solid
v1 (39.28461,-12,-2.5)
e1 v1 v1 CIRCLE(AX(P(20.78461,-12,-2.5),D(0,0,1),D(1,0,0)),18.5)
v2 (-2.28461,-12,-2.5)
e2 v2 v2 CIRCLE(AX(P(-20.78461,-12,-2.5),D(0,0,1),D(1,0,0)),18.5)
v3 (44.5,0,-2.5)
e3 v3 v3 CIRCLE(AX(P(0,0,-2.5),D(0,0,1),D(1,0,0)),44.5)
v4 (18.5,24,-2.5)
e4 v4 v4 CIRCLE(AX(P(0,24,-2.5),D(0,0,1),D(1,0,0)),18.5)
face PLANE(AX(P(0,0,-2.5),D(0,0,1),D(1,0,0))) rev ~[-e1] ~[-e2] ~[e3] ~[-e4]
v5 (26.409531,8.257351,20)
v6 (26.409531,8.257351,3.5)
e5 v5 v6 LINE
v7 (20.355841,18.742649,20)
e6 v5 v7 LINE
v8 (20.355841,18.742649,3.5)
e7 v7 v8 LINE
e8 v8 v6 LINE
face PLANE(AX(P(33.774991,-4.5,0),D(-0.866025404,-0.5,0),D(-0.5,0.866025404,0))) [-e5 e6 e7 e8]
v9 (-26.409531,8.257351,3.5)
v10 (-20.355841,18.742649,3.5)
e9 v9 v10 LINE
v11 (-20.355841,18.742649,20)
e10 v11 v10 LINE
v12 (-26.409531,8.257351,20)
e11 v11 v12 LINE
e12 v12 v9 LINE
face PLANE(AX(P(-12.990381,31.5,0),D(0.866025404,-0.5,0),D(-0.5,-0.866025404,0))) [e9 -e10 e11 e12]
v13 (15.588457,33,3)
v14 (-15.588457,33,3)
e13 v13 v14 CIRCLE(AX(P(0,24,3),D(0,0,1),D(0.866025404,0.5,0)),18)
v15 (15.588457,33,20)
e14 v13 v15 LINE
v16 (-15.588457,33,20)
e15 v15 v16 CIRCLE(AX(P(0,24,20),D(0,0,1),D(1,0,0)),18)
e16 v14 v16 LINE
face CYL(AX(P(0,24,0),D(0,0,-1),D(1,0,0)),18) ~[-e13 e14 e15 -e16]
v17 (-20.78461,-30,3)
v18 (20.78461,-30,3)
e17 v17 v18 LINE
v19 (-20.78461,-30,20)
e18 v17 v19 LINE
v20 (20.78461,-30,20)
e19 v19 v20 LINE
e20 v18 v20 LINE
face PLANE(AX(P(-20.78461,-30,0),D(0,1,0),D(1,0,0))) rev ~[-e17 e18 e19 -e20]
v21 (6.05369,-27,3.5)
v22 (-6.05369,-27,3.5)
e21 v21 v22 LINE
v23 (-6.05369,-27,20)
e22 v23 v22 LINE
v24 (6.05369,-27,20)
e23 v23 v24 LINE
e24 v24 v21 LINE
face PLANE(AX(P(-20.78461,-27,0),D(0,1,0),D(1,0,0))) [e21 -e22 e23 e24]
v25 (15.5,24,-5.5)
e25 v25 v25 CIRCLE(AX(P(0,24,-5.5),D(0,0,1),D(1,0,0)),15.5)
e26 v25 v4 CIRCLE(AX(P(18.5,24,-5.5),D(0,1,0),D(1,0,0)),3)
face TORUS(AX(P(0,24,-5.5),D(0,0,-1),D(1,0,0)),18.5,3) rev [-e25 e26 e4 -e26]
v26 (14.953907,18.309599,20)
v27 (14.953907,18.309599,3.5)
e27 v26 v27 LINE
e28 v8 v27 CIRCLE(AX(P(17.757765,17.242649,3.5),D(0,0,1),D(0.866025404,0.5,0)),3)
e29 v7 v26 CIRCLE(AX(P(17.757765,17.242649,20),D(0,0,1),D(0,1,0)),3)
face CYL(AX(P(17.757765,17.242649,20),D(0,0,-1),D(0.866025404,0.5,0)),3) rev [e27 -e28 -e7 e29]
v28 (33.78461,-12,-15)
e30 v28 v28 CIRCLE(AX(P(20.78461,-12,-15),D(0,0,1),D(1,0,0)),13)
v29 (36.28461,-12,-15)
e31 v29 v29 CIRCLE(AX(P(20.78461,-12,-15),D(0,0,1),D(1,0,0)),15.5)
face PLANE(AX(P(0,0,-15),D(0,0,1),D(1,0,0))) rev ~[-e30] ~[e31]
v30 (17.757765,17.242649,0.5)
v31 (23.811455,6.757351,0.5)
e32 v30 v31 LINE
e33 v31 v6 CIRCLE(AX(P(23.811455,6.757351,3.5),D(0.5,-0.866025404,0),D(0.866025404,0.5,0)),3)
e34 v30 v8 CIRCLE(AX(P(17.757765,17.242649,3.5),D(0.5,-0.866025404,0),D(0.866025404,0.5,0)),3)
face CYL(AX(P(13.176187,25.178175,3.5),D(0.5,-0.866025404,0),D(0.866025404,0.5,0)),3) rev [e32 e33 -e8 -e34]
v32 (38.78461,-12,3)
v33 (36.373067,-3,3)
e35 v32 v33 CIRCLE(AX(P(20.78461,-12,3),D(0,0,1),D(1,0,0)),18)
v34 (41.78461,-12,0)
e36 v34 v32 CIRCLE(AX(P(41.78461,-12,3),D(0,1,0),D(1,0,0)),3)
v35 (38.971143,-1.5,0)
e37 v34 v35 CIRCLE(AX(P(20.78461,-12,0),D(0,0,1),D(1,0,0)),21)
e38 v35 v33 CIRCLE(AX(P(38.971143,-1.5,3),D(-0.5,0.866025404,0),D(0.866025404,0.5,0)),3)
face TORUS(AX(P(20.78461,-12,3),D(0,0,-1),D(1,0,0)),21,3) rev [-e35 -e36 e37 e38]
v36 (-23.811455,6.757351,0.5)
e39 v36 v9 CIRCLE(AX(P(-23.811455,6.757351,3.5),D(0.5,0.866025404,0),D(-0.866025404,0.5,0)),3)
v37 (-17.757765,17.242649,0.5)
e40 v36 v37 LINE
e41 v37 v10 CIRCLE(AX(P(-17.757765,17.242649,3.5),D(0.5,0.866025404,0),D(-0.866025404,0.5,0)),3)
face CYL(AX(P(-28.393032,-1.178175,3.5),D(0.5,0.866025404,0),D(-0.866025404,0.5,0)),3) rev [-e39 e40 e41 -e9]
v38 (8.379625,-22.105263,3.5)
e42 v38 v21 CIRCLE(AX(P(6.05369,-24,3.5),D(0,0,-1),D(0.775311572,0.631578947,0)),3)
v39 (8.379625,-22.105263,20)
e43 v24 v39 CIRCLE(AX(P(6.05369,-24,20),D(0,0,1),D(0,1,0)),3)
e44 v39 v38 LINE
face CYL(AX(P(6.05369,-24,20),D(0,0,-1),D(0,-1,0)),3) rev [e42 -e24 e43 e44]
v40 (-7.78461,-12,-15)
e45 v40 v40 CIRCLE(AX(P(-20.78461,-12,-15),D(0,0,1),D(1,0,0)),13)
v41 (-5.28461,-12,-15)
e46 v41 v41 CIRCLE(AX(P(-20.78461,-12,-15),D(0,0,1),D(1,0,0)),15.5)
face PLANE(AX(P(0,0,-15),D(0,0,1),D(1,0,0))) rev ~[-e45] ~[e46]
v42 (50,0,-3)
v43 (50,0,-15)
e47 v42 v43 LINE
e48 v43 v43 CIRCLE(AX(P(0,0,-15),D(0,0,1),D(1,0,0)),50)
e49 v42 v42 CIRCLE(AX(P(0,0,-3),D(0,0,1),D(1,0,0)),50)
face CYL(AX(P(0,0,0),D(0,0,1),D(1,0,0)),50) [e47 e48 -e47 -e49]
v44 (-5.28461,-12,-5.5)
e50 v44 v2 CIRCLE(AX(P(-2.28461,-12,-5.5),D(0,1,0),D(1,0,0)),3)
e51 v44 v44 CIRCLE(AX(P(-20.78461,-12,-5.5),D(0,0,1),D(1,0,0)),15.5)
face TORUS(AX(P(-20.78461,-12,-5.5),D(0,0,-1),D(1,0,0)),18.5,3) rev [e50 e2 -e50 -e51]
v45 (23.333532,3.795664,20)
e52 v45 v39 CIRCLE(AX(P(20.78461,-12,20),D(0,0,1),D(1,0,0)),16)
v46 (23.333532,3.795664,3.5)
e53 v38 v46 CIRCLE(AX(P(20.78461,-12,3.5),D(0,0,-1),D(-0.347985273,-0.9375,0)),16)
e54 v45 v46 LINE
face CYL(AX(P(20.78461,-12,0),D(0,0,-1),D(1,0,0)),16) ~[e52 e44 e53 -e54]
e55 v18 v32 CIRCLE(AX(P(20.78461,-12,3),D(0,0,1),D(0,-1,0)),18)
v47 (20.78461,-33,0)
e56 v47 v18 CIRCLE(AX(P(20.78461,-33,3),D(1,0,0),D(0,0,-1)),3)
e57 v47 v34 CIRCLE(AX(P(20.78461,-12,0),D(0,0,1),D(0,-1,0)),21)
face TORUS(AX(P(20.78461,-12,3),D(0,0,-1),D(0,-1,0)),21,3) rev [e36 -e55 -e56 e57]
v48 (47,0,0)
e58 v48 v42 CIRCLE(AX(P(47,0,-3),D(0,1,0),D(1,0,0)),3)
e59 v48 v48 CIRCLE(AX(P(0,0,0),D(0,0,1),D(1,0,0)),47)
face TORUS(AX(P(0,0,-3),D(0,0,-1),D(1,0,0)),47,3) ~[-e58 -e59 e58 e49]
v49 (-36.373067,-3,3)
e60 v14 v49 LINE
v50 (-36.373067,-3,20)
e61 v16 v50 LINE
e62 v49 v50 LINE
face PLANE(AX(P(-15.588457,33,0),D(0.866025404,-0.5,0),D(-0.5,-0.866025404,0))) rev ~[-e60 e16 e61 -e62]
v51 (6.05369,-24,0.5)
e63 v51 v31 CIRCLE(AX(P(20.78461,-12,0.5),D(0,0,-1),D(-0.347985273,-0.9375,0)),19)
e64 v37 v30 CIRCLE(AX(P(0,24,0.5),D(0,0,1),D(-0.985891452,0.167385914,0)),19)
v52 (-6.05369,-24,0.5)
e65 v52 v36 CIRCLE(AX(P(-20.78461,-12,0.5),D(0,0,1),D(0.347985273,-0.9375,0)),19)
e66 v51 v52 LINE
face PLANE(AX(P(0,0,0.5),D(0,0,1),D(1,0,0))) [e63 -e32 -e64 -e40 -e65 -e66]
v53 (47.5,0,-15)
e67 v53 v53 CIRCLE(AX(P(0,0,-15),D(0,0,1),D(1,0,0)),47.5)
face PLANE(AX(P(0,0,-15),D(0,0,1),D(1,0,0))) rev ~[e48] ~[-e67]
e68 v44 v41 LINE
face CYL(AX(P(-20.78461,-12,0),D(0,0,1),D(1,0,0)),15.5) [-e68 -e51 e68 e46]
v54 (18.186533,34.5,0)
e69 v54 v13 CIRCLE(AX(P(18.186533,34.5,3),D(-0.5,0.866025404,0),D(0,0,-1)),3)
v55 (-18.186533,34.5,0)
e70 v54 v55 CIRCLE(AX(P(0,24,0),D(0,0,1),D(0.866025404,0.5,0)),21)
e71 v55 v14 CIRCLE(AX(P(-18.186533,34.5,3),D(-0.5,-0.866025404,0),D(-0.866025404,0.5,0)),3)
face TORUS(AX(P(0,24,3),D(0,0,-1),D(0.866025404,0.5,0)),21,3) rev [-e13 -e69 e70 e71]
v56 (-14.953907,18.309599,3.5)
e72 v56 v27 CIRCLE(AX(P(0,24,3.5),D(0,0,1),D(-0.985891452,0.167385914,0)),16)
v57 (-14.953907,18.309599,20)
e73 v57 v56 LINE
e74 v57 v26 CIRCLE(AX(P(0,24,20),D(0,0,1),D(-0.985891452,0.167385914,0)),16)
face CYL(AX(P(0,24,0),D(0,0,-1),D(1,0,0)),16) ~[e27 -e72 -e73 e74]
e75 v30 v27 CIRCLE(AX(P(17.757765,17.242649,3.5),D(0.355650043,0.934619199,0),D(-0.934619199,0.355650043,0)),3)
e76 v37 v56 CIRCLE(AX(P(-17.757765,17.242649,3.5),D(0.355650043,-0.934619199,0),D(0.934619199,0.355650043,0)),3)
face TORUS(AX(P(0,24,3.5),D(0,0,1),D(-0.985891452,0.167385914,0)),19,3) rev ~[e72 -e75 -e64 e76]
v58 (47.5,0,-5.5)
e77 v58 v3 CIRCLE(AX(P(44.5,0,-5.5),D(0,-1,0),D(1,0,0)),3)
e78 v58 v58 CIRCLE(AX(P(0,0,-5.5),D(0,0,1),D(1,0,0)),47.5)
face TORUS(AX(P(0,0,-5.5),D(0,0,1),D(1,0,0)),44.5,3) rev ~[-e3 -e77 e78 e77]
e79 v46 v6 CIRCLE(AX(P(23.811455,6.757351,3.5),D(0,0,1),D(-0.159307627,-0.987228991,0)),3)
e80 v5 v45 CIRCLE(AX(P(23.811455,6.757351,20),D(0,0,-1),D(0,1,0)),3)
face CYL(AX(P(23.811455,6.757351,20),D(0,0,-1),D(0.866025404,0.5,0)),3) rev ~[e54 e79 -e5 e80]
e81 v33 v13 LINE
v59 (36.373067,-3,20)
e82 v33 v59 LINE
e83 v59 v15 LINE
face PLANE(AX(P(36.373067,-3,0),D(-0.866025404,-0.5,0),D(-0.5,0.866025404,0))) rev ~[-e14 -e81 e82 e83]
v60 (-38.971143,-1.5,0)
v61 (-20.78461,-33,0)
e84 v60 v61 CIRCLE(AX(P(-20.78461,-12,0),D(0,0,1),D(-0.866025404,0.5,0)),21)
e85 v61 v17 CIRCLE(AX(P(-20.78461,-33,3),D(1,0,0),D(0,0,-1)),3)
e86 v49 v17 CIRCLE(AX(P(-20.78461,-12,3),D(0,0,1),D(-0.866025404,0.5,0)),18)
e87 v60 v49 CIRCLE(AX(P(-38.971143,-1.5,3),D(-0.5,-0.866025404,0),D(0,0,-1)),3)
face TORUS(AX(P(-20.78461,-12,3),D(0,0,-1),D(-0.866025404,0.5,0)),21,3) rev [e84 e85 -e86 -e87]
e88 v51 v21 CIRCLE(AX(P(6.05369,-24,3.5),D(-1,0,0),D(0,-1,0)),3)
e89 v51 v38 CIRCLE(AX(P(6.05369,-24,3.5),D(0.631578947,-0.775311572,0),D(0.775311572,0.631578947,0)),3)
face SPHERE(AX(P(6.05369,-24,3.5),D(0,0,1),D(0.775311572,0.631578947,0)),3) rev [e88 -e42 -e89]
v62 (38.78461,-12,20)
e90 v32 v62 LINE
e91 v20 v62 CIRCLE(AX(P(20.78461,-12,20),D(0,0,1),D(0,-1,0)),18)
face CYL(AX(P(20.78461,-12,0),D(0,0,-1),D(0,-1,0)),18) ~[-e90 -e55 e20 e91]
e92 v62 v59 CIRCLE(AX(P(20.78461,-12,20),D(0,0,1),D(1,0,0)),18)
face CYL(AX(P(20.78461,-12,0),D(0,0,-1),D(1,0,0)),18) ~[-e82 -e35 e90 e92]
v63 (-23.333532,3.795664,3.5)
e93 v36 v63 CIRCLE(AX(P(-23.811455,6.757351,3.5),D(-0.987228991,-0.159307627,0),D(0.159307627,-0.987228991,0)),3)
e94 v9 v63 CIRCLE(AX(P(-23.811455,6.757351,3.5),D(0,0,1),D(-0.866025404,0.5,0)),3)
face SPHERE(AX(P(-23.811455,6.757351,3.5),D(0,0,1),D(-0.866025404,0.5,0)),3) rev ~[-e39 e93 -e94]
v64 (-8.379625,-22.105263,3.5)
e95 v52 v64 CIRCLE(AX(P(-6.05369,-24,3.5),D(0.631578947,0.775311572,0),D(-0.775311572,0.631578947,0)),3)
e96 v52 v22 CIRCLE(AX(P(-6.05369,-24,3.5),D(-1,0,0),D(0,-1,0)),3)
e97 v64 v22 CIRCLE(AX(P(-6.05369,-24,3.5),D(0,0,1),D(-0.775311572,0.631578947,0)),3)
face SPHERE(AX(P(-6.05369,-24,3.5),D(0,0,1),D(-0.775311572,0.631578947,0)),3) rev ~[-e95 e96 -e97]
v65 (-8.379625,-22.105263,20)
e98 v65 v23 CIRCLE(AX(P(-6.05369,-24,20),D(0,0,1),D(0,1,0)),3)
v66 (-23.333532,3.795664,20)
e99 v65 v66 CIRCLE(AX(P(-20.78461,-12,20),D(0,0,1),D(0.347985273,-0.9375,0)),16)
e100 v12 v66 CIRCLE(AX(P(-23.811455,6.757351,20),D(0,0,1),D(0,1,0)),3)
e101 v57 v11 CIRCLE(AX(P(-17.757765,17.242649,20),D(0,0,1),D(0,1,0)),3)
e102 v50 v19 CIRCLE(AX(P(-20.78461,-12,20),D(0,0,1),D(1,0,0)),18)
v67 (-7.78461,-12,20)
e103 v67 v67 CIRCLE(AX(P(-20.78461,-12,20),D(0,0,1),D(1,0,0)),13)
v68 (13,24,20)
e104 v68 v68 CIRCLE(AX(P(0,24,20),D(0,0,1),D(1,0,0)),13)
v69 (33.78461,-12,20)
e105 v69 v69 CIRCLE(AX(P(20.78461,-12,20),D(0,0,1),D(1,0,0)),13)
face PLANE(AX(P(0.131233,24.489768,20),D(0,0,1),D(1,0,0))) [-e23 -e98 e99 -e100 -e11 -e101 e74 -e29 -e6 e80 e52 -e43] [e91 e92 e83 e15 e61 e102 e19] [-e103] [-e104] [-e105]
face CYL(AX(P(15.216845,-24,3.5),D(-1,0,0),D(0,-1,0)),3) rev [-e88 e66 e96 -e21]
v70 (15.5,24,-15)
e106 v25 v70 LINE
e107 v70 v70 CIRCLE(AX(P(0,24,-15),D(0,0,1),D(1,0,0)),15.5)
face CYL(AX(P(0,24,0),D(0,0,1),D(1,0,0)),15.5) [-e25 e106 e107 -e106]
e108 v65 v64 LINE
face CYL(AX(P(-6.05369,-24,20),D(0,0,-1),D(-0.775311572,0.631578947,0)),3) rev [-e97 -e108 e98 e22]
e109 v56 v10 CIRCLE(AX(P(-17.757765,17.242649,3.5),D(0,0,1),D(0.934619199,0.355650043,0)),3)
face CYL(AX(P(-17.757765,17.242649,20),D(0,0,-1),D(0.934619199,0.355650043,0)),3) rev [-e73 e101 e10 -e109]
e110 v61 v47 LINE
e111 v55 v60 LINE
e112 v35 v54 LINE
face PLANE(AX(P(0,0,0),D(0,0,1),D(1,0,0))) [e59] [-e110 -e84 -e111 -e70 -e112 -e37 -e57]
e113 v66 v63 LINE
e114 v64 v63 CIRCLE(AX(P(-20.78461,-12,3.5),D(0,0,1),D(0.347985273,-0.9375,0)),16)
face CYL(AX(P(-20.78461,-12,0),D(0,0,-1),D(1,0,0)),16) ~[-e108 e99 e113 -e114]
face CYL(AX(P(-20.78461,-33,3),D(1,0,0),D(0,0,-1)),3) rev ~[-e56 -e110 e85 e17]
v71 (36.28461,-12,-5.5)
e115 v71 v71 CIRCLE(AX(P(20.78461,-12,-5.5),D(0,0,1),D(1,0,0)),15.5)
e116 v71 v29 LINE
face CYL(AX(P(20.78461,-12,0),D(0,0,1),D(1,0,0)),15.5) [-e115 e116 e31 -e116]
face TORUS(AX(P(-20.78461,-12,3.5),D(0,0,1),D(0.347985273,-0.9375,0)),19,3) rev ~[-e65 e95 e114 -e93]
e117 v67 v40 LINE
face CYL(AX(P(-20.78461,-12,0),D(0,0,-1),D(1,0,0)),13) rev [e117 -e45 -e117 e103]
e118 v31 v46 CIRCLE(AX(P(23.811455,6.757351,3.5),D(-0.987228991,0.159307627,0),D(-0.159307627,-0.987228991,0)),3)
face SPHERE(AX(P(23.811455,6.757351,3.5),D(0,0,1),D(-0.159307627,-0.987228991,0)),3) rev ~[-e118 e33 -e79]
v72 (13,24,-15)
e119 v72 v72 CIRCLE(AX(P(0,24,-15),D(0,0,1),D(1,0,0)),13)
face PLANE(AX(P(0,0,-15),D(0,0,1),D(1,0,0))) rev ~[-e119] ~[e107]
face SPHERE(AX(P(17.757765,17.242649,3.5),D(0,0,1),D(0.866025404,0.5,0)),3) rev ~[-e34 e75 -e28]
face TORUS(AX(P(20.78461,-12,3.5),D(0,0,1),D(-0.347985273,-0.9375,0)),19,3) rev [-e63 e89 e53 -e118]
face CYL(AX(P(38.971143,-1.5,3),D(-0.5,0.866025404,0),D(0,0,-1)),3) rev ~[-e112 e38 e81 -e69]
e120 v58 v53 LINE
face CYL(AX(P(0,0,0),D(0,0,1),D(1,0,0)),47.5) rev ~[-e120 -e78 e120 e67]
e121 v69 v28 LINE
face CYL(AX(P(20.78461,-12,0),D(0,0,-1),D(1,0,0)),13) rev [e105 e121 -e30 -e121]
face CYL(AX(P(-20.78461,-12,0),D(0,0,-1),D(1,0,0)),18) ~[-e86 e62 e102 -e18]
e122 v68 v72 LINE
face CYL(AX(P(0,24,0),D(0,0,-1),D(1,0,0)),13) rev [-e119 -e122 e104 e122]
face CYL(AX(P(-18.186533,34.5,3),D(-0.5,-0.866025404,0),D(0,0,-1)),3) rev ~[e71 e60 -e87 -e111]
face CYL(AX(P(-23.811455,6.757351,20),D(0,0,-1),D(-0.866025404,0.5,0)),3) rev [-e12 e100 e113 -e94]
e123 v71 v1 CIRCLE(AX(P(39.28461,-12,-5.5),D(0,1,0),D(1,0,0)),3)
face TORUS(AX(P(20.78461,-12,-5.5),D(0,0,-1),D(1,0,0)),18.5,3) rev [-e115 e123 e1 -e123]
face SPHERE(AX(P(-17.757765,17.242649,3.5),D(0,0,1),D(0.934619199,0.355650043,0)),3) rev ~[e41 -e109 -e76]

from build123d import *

# Parameters (mm, degrees)
F0_R         = 50
F0_R_2       = 13
F1_DEPTH     = 15
F2_T         = -2.5
F3_DEPTH     = 20
F4_T         = 3
F4_T3_DEPTH  = 47.5692193817
F4_T5_DEPTH  = 47.5692193817
F4_T7_DEPTH  = 47.5692193817
F4_T18_ANGLE = 120.000000001
F4_T20_ANGLE = 120.000000001
F4_T22_ANGLE = 120.000000001
F5_R         = 3


# Not quite as in the source:
# - two fillets or chamfers of one size are made in one step
# - a shell that OpenCascade refuses in one call is made with other operations: the cavity is built on its own and cut out


with BuildPart() as f1:
    # F0 (on Top) → F1 (new body)
    with BuildSketch(Plane.XY):
        Circle(F0_R)
        with BuildLine():
            ThreePointArc((-20.7846096908, -30), (-36.3730669589, -21), (-36.3730669589, -3))
            Line((-36.3730669589, -3), (-15.5884572681, 33))
            ThreePointArc((-15.5884572681, 33), (0, 42), (15.5884572681, 33))
            Line((15.5884572681, 33), (36.3730669589, -3))
            ThreePointArc((36.3730669589, -3), (38.171274564, -7.3412571882), (38.7846096908, -12))
            ThreePointArc((38.7846096908, -12), (33.5125317522, -24.7279220614), (20.7846096908, -30))
            Line((20.7846096908, -30), (-20.7846096908, -30))
        make_face(mode=Mode.SUBTRACT)
        with BuildLine():
            ThreePointArc((-20.7846096908, -30), (-8.0566876295, -24.7279220614), (-2.7846096908, -12))
            ThreePointArc((-2.7846096908, -12), (-16.125866879, 5.3866648732), (-36.3730669589, -3))
            ThreePointArc((-36.3730669589, -3), (-36.3730669589, -21), (-20.7846096908, -30))
        make_face()
        with Locations((-20.7846096908, -12)):
            Circle(F0_R_2, mode=Mode.SUBTRACT)
        with BuildLine():
            ThreePointArc((15.5884572681, 33), (0, 42), (-15.5884572681, 33))
            ThreePointArc((-15.5884572681, 33), (-4.6587428118, 6.6133351268), (18, 24))
            ThreePointArc((18, 24), (17.3866648732, 28.6587428118), (15.5884572681, 33))
        make_face()
        with Locations((0, 24)):
            Circle(F0_R_2, mode=Mode.SUBTRACT)
        with BuildLine():
            ThreePointArc((36.3730669589, -3), (5.1961524227, -3), (20.7846096908, -30))
            ThreePointArc((20.7846096908, -30), (33.5125317522, -24.7279220614), (38.7846096908, -12))
            ThreePointArc((38.7846096908, -12), (38.171274564, -7.3412571882), (36.3730669589, -3))
        make_face()
        with Locations((20.7846096908, -12)):
            Circle(F0_R_2, mode=Mode.SUBTRACT)
        with BuildLine():
            ThreePointArc((-36.3730669589, -3), (-16.125866879, 5.3866648732), (-2.7846096908, -12))
            ThreePointArc((-2.7846096908, -12), (-8.0566876295, -24.7279220614), (-20.7846096908, -30))
            Line((-20.7846096908, -30), (20.7846096908, -30))
            ThreePointArc((20.7846096908, -30), (5.1961524227, -3), (36.3730669589, -3))
            Line((36.3730669589, -3), (15.5884572681, 33))
            ThreePointArc((15.5884572681, 33), (17.3866648732, 28.6587428118), (18, 24))
            ThreePointArc((18, 24), (-4.6587428118, 6.6133351268), (-15.5884572681, 33))
            Line((-15.5884572681, 33), (-36.3730669589, -3))
        make_face()
    extrude(amount=-F1_DEPTH)

    # F2
    f2_openings = [f1.faces().sort_by_distance(p)[0] for p in [
        (0, 0, -15),
    ]]
    offset(amount=F2_T, openings=f2_openings)

    # F0 (on Top) → F3 (join)
    with BuildSketch(Plane.XY):
        with BuildLine():
            ThreePointArc((15.5884572681, 33), (0, 42), (-15.5884572681, 33))
            ThreePointArc((-15.5884572681, 33), (-4.6587428118, 6.6133351268), (18, 24))
            ThreePointArc((18, 24), (17.3866648732, 28.6587428118), (15.5884572681, 33))
        make_face()
        with Locations((0, 24)):
            Circle(F0_R_2, mode=Mode.SUBTRACT)
        with BuildLine():
            ThreePointArc((-20.7846096908, -30), (-8.0566876295, -24.7279220614), (-2.7846096908, -12))
            ThreePointArc((-2.7846096908, -12), (-16.125866879, 5.3866648732), (-36.3730669589, -3))
            ThreePointArc((-36.3730669589, -3), (-36.3730669589, -21), (-20.7846096908, -30))
        make_face()
        with Locations((-20.7846096908, -12)):
            Circle(F0_R_2, mode=Mode.SUBTRACT)
        with BuildLine():
            ThreePointArc((36.3730669589, -3), (5.1961524227, -3), (20.7846096908, -30))
            ThreePointArc((20.7846096908, -30), (33.5125317522, -24.7279220614), (38.7846096908, -12))
            ThreePointArc((38.7846096908, -12), (38.171274564, -7.3412571882), (36.3730669589, -3))
        make_face()
        with Locations((20.7846096908, -12)):
            Circle(F0_R_2, mode=Mode.SUBTRACT)
        with BuildLine():
            ThreePointArc((-36.3730669589, -3), (-16.125866879, 5.3866648732), (-2.7846096908, -12))
            ThreePointArc((-2.7846096908, -12), (-8.0566876295, -24.7279220614), (-20.7846096908, -30))
            Line((-20.7846096908, -30), (20.7846096908, -30))
            ThreePointArc((20.7846096908, -30), (5.1961524227, -3), (36.3730669589, -3))
            Line((36.3730669589, -3), (15.5884572681, 33))
            ThreePointArc((15.5884572681, 33), (17.3866648732, 28.6587428118), (18, 24))
            ThreePointArc((18, 24), (-4.6587428118, 6.6133351268), (-15.5884572681, 33))
            Line((-15.5884572681, 33), (-36.3730669589, -3))
        make_face()
    extrude(amount=F3_DEPTH)

    # F4: shell of thickness 3, made by hand


with BuildPart() as f4_core1:
    # F4_t2: copy of F1
    add(f1.part)

    # the walls: a layer under each face that stays
    f4_faces = [f4_core1.faces().sort_by_distance(p)[0] for p in [
        (-50, 0, -7.5),
        (-46.6666666667, -13.3333333333, -15),
        (-47.5, 0, -8.75),
        (0, 0, -2.5),
        (-15.5, 24, -8.75),
        (-10.3333333333, 13.6666666667, -15),
        (-13, 24, 2.5),
        (7.7846096908, -12, 2.5),
        (10.4512763575, -22.3333333333, -15),
        (-33.7846096908, -12, 2.5),
        (-31.1179430242, -22.3333333333, -15),
        (25.9807621135, 15, 10),
        (36.3730669589, -21, 10),
        (0, -30, 10),
        (-36.3730669589, -21, 10),
        (-25.9807621135, 15, 10),
        (0, 42, 10),
        (-36.2846096908, -12, -8.75),
        (5.2846096908, -12, -8.75),
        (-33.3333333333, -33.3333333333, 0),
    ]]
    thicken(f4_faces, amount=-F4_T, mode=Mode.SUBTRACT)

    # F4_s4 → F4_t3 (cut)
    with BuildSketch(Plane(origin=(11.8923048454, -20.5980762114, 0), x_dir=(0, 0, 1), z_dir=(-0.5, 0.8660254038, 0))):
        Polygon((0.03, 30.03), (0, 27), (-3, 27), (-3, 30), align=None)
    extrude(amount=F4_T3_DEPTH, mode=Mode.SUBTRACT)

    # F4_s6 → F4_t5 (cut)
    with BuildSketch(Plane.YZ.offset(-23.7846096908)):
        Polygon((-30.03, 0.03), (-27, 0), (-27, -3), (-30, -3), align=None)
    extrude(amount=F4_T5_DEPTH, mode=Mode.SUBTRACT)

    # F4_s8 → F4_t7 (cut)
    with BuildSketch(Plane(origin=(11.8923048454, 20.5980762114, 0), x_dir=(0, 0, 1), z_dir=(-0.5, -0.8660254038, 0))):
        Polygon((0.03, 30.03), (0, 27), (-3, 27), (-3, 30), align=None)
    extrude(amount=F4_T7_DEPTH, mode=Mode.SUBTRACT)

    # F4_s9 → F4_t10 (revolve, cut)
    with BuildSketch(Plane.XZ):
        Polygon((47.47, -2.53), (50.5, -2.5), (50.5, 0.5), (47.5, 0.5), align=None)
    revolve(axis=Axis((0, 0, -2.5), (0, 0, 1)), mode=Mode.SUBTRACT)

    # F4_s11 → F4_t12 (revolve, cut)
    with BuildSketch(Plane.XZ.offset(12)):
        Polygon((36.3146096908, -2.53), (36.2846096908, 0.5), (33.2846096908, 0.5), (33.2846096908, -2.5), align=None)
    revolve(axis=Axis((20.7846096908, -12, -2.5), (0, 0, 1)), mode=Mode.SUBTRACT)

    # F4_s13 → F4_t14 (revolve, cut)
    with BuildSketch(Plane.XZ.offset(12)):
        Polygon((-5.2546096908, -2.53), (-5.2846096908, 0.5), (-8.2846096908, 0.5), (-8.2846096908, -2.5), align=None)
    revolve(axis=Axis((-20.7846096908, -12, -2.5), (0, 0, 1)), mode=Mode.SUBTRACT)

    # F4_s15 → F4_t16 (revolve, cut)
    with BuildSketch(Plane.XZ.offset(-24)):
        Polygon((15.53, -2.53), (15.5, 0.5), (12.5, 0.5), (12.5, -2.5), align=None)
    revolve(axis=Axis((0, 24, -2.5), (0, 0, 1)), mode=Mode.SUBTRACT)

    # F4_s17 → F4_t18 (revolve, cut)
    with BuildSketch(Plane.YZ.offset(20.7846096908)):
        Polygon((-30.03, 0.03), (-27, 0), (-27, -3), (-30, -3), align=None)
    revolve(axis=Axis((20.7846096908, -12, 0), (0, 0, 1)), revolution_arc=F4_T18_ANGLE, mode=Mode.SUBTRACT)

    # F4_s19 → F4_t20 (revolve, cut)
    with BuildSketch(Plane(origin=(-10.3923048454, -18, 0), x_dir=(0, 0, 1), z_dir=(0.5, 0.8660254038, 0))):
        Polygon((0.03, -30.03), (0, -27), (-3, -27), (-3, -30), align=None)
    revolve(axis=Axis((-20.7846096908, -12, 0), (0, 0, 1)), revolution_arc=F4_T20_ANGLE, mode=Mode.SUBTRACT)

    # F4_s21 → F4_t22 (revolve, cut)
    with BuildSketch(Plane(origin=(-10.3923048454, 18, 0), x_dir=(0, 0, 1), z_dir=(0.5, -0.8660254038, 0))):
        Polygon((0.03, -30.03), (0, -27), (-3, -27), (-3, -30), align=None)
    revolve(axis=Axis((0, 24, 0), (0, 0, 1)), revolution_arc=F4_T22_ANGLE, mode=Mode.SUBTRACT)


with BuildPart() as f1_1:
    add(f1.part)

    # what is left inside the walls is the cavity
    f4_cavity = [f4_core1.part.solids().sort_by_distance(p)[0] for p in [
        (6.902222, -3.985, 13.5),
    ]]
    add(f4_cavity, mode=Mode.SUBTRACT)

    # F5
    f5_edges = [f1_1.edges().sort_by_distance(p)[0] for p in [
        (-47.5, 0, -2.5),
        (5.28461, -12, -2.5),
        (-36.28461, -12, -2.5),
        (-15.5, 24, -2.5),
        (6.928203, -4, 0.5),
        (23.382686, 13.5, 0.5),
        (0, 8, 0.5),
        (-23.382686, 13.5, 0.5),
        (-6.928203, -4, 0.5),
        (0, -27, 0.5),
        (0, -30, 0),
        (-50, 0, 0),
        (0, 42, 0),
        (-25.980762, 15, 0),
        (-36.373067, -21, 0),
        (36.373067, -21, 0),
        (25.980762, 15, 0),
        (-15.216845, -27, 10.25),
        (15.216845, -27, 10.25),
        (30.991109, 0.321825, 10.25),
        (15.774263, 26.678175, 10.25),
        (-15.774263, 26.678175, 10.25),
        (-30.991109, 0.321825, 10.25),
    ]]
    fillet(f5_edges, radius=F5_R)


solid = f1_1.part
